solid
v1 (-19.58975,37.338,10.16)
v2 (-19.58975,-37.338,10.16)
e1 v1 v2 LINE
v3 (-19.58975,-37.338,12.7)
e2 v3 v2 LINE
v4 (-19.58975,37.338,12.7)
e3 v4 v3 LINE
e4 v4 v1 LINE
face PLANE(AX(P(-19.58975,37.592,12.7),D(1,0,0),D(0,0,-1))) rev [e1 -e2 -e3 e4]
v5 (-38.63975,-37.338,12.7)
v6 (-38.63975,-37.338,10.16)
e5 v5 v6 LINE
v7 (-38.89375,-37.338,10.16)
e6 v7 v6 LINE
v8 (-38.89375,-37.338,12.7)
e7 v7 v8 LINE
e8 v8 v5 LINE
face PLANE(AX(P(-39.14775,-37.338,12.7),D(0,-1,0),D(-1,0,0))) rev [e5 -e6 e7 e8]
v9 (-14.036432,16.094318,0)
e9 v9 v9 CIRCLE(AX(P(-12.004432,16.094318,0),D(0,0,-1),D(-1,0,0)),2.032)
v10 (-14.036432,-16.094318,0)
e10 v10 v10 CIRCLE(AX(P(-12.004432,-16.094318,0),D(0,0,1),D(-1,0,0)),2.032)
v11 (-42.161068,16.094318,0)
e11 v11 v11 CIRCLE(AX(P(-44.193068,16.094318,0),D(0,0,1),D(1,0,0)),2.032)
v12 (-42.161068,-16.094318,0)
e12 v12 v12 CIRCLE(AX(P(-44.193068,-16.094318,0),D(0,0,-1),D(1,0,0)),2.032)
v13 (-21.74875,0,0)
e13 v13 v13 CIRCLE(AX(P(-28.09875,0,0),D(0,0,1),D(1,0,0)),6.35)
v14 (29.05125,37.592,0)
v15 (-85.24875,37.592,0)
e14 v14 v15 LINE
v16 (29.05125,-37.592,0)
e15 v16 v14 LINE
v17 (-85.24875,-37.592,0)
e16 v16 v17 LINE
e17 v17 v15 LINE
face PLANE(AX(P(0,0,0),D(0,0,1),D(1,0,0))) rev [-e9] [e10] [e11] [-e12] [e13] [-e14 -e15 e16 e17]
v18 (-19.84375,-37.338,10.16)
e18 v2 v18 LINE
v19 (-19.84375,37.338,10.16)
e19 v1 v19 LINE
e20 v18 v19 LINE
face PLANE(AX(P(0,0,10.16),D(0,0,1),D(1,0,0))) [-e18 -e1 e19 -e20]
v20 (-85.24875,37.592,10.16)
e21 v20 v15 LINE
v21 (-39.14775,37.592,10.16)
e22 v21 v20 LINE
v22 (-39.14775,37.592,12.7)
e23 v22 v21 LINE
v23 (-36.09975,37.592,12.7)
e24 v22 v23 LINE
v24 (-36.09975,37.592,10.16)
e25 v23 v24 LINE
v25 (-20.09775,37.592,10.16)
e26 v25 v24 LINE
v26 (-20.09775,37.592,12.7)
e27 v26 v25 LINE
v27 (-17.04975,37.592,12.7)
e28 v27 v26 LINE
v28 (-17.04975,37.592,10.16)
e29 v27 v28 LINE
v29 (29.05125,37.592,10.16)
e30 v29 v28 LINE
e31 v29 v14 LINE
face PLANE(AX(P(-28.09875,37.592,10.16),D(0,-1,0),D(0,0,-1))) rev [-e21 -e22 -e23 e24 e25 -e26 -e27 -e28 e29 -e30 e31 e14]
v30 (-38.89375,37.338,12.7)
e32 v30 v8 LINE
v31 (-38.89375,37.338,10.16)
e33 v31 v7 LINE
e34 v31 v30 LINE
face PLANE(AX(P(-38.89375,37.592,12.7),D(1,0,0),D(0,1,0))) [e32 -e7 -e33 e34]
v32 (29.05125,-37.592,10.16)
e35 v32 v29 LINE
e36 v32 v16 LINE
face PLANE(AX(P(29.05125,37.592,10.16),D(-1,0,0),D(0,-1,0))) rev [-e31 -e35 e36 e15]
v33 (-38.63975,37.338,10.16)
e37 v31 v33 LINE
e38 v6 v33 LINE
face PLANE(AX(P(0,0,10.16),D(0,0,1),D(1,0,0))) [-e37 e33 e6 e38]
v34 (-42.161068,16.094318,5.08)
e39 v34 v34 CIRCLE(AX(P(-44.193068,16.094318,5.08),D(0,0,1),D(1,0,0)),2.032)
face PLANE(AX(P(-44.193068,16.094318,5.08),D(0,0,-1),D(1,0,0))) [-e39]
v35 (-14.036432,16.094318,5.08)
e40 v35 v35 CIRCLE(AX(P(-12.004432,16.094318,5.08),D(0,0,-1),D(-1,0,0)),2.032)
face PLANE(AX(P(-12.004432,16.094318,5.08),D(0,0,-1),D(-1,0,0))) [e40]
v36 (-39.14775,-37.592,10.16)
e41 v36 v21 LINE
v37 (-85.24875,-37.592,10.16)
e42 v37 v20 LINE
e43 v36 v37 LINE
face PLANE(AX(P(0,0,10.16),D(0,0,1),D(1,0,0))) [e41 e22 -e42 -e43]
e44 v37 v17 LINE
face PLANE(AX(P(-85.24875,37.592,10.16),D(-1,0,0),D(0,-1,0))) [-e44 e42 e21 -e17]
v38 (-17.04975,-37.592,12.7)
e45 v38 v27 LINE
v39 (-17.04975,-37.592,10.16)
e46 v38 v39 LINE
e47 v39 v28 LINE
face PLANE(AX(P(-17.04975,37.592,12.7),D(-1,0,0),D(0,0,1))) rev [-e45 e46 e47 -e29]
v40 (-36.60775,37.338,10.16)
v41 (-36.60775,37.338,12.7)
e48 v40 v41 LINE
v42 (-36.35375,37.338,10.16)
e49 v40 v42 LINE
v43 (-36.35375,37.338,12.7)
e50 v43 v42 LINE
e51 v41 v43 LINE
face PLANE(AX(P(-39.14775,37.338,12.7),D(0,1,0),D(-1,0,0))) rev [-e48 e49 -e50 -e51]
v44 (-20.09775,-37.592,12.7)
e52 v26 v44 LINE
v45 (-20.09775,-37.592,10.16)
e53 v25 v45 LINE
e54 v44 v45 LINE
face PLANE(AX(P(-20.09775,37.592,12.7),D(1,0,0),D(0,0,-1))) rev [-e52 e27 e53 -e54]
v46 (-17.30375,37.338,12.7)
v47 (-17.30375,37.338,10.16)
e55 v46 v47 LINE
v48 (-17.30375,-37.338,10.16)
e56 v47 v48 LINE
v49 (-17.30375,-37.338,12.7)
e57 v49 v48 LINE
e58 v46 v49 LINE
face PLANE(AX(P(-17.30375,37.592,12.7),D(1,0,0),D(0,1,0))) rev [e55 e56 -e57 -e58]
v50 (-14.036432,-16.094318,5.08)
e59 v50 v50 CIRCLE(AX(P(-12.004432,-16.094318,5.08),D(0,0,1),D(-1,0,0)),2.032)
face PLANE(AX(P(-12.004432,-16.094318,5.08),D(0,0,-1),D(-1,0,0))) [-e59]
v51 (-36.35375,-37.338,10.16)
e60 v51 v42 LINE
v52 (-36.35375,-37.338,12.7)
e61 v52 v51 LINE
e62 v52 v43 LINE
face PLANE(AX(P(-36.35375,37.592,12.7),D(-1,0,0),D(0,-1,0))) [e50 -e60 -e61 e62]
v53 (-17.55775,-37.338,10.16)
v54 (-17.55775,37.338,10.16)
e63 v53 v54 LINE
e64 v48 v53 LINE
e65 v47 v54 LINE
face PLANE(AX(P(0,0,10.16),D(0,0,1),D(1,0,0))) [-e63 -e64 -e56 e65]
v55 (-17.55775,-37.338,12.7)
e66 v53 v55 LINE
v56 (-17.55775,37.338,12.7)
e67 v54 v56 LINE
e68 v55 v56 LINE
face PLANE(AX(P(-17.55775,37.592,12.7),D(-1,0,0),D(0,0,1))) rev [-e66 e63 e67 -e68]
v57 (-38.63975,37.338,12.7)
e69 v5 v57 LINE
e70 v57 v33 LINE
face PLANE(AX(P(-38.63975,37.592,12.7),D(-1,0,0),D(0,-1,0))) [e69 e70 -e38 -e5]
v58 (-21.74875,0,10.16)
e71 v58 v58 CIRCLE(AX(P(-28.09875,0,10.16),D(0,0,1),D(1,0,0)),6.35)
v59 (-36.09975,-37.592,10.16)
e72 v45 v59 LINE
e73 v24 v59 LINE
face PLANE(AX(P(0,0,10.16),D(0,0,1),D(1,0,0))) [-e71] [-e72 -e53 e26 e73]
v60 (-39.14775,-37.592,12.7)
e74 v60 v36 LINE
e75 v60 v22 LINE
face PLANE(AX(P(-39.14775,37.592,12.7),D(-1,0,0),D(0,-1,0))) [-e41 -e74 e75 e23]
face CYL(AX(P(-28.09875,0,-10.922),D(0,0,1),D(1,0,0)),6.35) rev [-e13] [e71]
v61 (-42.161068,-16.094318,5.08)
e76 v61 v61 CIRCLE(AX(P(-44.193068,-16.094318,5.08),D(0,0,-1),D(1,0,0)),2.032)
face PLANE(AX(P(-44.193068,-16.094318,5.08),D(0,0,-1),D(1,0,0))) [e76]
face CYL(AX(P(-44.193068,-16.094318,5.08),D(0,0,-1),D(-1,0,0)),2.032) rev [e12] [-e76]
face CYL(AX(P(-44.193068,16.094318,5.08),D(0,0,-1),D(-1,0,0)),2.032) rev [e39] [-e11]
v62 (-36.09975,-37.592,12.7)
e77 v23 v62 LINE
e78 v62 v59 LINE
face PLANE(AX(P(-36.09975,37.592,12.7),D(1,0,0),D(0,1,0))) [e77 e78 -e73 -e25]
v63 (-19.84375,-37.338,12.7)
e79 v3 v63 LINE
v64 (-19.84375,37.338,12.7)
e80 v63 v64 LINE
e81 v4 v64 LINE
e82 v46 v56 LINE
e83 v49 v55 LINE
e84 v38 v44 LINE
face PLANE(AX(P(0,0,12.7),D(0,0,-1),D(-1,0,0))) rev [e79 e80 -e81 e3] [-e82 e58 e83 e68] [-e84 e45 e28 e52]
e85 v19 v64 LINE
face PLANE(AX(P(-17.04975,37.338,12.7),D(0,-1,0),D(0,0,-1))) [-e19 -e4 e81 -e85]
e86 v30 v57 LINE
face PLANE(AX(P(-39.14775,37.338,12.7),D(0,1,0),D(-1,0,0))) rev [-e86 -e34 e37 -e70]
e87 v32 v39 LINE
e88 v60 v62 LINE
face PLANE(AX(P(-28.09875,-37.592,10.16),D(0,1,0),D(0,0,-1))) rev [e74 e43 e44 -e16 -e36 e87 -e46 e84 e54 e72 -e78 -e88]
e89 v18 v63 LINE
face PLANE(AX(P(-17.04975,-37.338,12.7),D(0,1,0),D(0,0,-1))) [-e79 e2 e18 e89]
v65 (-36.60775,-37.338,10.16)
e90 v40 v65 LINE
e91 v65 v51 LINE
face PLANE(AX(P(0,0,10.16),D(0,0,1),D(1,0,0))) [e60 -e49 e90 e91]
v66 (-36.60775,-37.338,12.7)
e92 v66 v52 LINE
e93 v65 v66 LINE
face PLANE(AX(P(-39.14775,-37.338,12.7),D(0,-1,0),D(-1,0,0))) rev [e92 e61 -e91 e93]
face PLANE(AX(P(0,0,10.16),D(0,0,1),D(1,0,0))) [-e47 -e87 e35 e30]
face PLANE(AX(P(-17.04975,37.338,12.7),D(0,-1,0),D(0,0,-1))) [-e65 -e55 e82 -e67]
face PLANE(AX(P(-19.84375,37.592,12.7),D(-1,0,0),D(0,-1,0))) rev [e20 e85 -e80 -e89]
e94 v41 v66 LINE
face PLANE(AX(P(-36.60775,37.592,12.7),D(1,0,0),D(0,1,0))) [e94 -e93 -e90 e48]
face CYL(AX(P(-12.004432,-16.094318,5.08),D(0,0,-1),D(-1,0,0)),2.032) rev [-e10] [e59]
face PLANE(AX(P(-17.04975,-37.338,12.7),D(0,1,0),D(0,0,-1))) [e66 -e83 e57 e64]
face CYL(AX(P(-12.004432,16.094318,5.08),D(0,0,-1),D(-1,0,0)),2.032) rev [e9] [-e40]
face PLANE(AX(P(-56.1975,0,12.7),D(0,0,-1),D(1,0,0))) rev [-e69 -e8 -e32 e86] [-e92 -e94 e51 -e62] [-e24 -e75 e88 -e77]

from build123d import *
from build123d.topology import SkipClean

# Parameters (mm, degrees)
SKETCH1_W                 = 57.15
SKETCH1_H                 = 37.592
BOSS_EXTRUDE1_DEPTH       = 10.16
SKETCH2_W                 = 0.254
SKETCH2_H                 = 37.592
SKETCH2_W_2               = 2.032
BOSS_EXTRUDE2_DEPTH       = 2.54
SKETCH3_R                 = 6.35
CUT_EXTRUDE1_DEPTH        = 21.082
SKETCH4_R                 = 2.032
CUT_EXTRUDE2_DEPTH        = 5.08
SKETCH5_W                 = 2.54
SKETCH5_H                 = 0.254
BOSS_EXTRUDE3_DEPTH       = 3.048
MIRROR2_COPY_1_SKETCH_W   = 57.15
MIRROR2_COPY_1_SKETCH_H   = 37.592
MIRROR2_COPY_1_DEPTH      = 10.16
MIRROR2_COPY_2_SKETCH_W   = 0.254
MIRROR2_COPY_2_SKETCH_H   = 37.592
MIRROR2_COPY_2_SKETCH_W_2 = 2.032
MIRROR2_COPY_2_DEPTH      = 2.54
MIRROR2_COPY_3_SKETCH_R   = 6.35
MIRROR2_COPY_3_DEPTH      = 21.082
MIRROR2_COPY_4_SKETCH_R   = 2.032
MIRROR2_COPY_4_DEPTH      = 5.08
MIRROR2_COPY_5_SKETCH_W   = 2.54
MIRROR2_COPY_5_SKETCH_H   = 0.254
MIRROR2_COPY_5_DEPTH      = 3.048


with BuildPart() as part:
    # Sketch1 → Boss-Extrude1 (new body)
    with BuildSketch(Plane.XY):
        with Locations((0.47625, 18.796)):
            Rectangle(SKETCH1_W, SKETCH1_H)
    boss_extrude1 = extrude(amount=BOSS_EXTRUDE1_DEPTH)

    # Sketch2 → Boss-Extrude2 (add)
    with BuildSketch(Plane.XY.offset(10.16)):
        with Locations((-19.97075, 18.796)):
            Rectangle(SKETCH2_W, SKETCH2_H)
        with Locations((-18.57375, 18.796)):
            Rectangle(SKETCH2_W_2, SKETCH2_H)
        with Locations((-17.17675, 18.796)):
            Rectangle(SKETCH2_W, SKETCH2_H)
    boss_extrude2 = extrude(amount=BOSS_EXTRUDE2_DEPTH)

    # Sketch3 → Cut-Extrude1 (cut)
    with BuildSketch(Plane.XY.offset(10.16)):
        with Locations((-28.09875, 0)):
            Circle(SKETCH3_R)
    cut_extrude1 = extrude(amount=-CUT_EXTRUDE1_DEPTH, mode=Mode.SUBTRACT)

    # Sketch4 → Cut-Extrude2 (cut)
    with BuildSketch(Plane(origin=(0, 0, 0), x_dir=(-1, 0, 0), z_dir=(0, 0, -1))):
        with Locations((12.004431959, 16.094318041)):
            Circle(SKETCH4_R)
    cut_extrude2 = extrude(amount=-CUT_EXTRUDE2_DEPTH, mode=Mode.SUBTRACT)

    # Sketch5 → Boss-Extrude3 (add)
    with BuildSketch(Plane.ZY.offset(20.09775)):
        with Locations((11.43, 37.465)):
            Rectangle(SKETCH5_W, SKETCH5_H)
    boss_extrude3 = extrude(amount=-BOSS_EXTRUDE3_DEPTH)

    # Mirror1: Boss-Extrude1, Boss-Extrude2, Cut-Extrude1, Cut-Extrude2, Boss-Extrude3 across plane
    with SkipClean():  # the faces are left unmerged after this step: merging them gives an invalid solid
        add(boss_extrude1.mirror(Plane(origin=(-28.09875, 37.592, 10.16), x_dir=(0, 0, 1), z_dir=(1, 0, 0))))
        add(boss_extrude2.mirror(Plane(origin=(-28.09875, 37.592, 10.16), x_dir=(0, 0, 1), z_dir=(1, 0, 0))))
        add(cut_extrude1.mirror(Plane(origin=(-28.09875, 37.592, 10.16), x_dir=(0, 0, 1), z_dir=(1, 0, 0))), mode=Mode.SUBTRACT)
        add(cut_extrude2.mirror(Plane(origin=(-28.09875, 37.592, 10.16), x_dir=(0, 0, 1), z_dir=(1, 0, 0))), mode=Mode.SUBTRACT)
        add(boss_extrude3.mirror(Plane(origin=(-28.09875, 37.592, 10.16), x_dir=(0, 0, 1), z_dir=(1, 0, 0))))
    add(part.part.scale(1), mode=Mode.REPLACE)  # the faces are merged on a copy

    # Mirror2: Boss-Extrude1, Boss-Extrude2, Cut-Extrude1, Cut-Extrude2, Boss-Extrude3 across plane
    with SkipClean():  # the faces are left unmerged after this step: merging them gives an invalid solid
        add(boss_extrude1.mirror(Plane.ZX))
        add(boss_extrude2.mirror(Plane.ZX))
        add(cut_extrude1.mirror(Plane.ZX), mode=Mode.SUBTRACT)
        add(cut_extrude2.mirror(Plane.ZX), mode=Mode.SUBTRACT)
        add(boss_extrude3.mirror(Plane.ZX))
    add(part.part.scale(1), mode=Mode.REPLACE)  # the faces are merged on a copy

    # Mirror2 copy 1 sketch → Mirror2 copy 1 (add)
    with BuildSketch(Plane(origin=(-56.1975, 0, 0), x_dir=(-1, 0, 0), z_dir=(0, 0, 1))):
        with Locations((0.47625, 18.796)):
            Rectangle(MIRROR2_COPY_1_SKETCH_W, MIRROR2_COPY_1_SKETCH_H)
    extrude(amount=MIRROR2_COPY_1_DEPTH)

    # Mirror2 copy 2 sketch → Mirror2 copy 2 (add)
    with BuildSketch(Plane(origin=(-56.1975, 0, 10.16), x_dir=(-1, 0, 0), z_dir=(0, 0, 1))):
        with Locations((-19.97075, 18.796)):
            Rectangle(MIRROR2_COPY_2_SKETCH_W, MIRROR2_COPY_2_SKETCH_H)
        with Locations((-18.57375, 18.796)):
            Rectangle(MIRROR2_COPY_2_SKETCH_W_2, MIRROR2_COPY_2_SKETCH_H)
        with Locations((-17.17675, 18.796)):
            Rectangle(MIRROR2_COPY_2_SKETCH_W, MIRROR2_COPY_2_SKETCH_H)
    extrude(amount=MIRROR2_COPY_2_DEPTH)

    # Mirror2 copy 3 sketch → Mirror2 copy 3 (cut)
    with SkipClean():  # the faces are left unmerged after this step: merging them gives an invalid solid
        with BuildSketch(Plane(origin=(-56.1975, 0, 10.16), x_dir=(-1, 0, 0), z_dir=(0, 0, 1))):
            with Locations((-28.09875, 0)):
                Circle(MIRROR2_COPY_3_SKETCH_R)
        extrude(amount=-MIRROR2_COPY_3_DEPTH, mode=Mode.SUBTRACT)

    # Mirror2 copy 4 sketch → Mirror2 copy 4 (cut)
    with SkipClean():  # the faces are left unmerged after this step: merging them gives an invalid solid
        with BuildSketch(Plane(origin=(-56.1975, 0, 0), x_dir=(1, 0, 0), z_dir=(0, 0, -1))):
            with Locations((12.004431959, 16.094318041)):
                Circle(MIRROR2_COPY_4_SKETCH_R)
        extrude(amount=-MIRROR2_COPY_4_DEPTH, mode=Mode.SUBTRACT)

    # Mirror2 copy 5 sketch → Mirror2 copy 5 (add)
    with SkipClean():  # the faces are left unmerged after this step: merging them gives an invalid solid
        with BuildSketch(Plane(origin=(-36.09975, 0, 0), x_dir=(0, 0, 1), z_dir=(1, 0, 0))):
            with Locations((11.43, 37.465)):
                Rectangle(MIRROR2_COPY_5_SKETCH_W, MIRROR2_COPY_5_SKETCH_H)
        extrude(amount=-MIRROR2_COPY_5_DEPTH)


solid = part.part
